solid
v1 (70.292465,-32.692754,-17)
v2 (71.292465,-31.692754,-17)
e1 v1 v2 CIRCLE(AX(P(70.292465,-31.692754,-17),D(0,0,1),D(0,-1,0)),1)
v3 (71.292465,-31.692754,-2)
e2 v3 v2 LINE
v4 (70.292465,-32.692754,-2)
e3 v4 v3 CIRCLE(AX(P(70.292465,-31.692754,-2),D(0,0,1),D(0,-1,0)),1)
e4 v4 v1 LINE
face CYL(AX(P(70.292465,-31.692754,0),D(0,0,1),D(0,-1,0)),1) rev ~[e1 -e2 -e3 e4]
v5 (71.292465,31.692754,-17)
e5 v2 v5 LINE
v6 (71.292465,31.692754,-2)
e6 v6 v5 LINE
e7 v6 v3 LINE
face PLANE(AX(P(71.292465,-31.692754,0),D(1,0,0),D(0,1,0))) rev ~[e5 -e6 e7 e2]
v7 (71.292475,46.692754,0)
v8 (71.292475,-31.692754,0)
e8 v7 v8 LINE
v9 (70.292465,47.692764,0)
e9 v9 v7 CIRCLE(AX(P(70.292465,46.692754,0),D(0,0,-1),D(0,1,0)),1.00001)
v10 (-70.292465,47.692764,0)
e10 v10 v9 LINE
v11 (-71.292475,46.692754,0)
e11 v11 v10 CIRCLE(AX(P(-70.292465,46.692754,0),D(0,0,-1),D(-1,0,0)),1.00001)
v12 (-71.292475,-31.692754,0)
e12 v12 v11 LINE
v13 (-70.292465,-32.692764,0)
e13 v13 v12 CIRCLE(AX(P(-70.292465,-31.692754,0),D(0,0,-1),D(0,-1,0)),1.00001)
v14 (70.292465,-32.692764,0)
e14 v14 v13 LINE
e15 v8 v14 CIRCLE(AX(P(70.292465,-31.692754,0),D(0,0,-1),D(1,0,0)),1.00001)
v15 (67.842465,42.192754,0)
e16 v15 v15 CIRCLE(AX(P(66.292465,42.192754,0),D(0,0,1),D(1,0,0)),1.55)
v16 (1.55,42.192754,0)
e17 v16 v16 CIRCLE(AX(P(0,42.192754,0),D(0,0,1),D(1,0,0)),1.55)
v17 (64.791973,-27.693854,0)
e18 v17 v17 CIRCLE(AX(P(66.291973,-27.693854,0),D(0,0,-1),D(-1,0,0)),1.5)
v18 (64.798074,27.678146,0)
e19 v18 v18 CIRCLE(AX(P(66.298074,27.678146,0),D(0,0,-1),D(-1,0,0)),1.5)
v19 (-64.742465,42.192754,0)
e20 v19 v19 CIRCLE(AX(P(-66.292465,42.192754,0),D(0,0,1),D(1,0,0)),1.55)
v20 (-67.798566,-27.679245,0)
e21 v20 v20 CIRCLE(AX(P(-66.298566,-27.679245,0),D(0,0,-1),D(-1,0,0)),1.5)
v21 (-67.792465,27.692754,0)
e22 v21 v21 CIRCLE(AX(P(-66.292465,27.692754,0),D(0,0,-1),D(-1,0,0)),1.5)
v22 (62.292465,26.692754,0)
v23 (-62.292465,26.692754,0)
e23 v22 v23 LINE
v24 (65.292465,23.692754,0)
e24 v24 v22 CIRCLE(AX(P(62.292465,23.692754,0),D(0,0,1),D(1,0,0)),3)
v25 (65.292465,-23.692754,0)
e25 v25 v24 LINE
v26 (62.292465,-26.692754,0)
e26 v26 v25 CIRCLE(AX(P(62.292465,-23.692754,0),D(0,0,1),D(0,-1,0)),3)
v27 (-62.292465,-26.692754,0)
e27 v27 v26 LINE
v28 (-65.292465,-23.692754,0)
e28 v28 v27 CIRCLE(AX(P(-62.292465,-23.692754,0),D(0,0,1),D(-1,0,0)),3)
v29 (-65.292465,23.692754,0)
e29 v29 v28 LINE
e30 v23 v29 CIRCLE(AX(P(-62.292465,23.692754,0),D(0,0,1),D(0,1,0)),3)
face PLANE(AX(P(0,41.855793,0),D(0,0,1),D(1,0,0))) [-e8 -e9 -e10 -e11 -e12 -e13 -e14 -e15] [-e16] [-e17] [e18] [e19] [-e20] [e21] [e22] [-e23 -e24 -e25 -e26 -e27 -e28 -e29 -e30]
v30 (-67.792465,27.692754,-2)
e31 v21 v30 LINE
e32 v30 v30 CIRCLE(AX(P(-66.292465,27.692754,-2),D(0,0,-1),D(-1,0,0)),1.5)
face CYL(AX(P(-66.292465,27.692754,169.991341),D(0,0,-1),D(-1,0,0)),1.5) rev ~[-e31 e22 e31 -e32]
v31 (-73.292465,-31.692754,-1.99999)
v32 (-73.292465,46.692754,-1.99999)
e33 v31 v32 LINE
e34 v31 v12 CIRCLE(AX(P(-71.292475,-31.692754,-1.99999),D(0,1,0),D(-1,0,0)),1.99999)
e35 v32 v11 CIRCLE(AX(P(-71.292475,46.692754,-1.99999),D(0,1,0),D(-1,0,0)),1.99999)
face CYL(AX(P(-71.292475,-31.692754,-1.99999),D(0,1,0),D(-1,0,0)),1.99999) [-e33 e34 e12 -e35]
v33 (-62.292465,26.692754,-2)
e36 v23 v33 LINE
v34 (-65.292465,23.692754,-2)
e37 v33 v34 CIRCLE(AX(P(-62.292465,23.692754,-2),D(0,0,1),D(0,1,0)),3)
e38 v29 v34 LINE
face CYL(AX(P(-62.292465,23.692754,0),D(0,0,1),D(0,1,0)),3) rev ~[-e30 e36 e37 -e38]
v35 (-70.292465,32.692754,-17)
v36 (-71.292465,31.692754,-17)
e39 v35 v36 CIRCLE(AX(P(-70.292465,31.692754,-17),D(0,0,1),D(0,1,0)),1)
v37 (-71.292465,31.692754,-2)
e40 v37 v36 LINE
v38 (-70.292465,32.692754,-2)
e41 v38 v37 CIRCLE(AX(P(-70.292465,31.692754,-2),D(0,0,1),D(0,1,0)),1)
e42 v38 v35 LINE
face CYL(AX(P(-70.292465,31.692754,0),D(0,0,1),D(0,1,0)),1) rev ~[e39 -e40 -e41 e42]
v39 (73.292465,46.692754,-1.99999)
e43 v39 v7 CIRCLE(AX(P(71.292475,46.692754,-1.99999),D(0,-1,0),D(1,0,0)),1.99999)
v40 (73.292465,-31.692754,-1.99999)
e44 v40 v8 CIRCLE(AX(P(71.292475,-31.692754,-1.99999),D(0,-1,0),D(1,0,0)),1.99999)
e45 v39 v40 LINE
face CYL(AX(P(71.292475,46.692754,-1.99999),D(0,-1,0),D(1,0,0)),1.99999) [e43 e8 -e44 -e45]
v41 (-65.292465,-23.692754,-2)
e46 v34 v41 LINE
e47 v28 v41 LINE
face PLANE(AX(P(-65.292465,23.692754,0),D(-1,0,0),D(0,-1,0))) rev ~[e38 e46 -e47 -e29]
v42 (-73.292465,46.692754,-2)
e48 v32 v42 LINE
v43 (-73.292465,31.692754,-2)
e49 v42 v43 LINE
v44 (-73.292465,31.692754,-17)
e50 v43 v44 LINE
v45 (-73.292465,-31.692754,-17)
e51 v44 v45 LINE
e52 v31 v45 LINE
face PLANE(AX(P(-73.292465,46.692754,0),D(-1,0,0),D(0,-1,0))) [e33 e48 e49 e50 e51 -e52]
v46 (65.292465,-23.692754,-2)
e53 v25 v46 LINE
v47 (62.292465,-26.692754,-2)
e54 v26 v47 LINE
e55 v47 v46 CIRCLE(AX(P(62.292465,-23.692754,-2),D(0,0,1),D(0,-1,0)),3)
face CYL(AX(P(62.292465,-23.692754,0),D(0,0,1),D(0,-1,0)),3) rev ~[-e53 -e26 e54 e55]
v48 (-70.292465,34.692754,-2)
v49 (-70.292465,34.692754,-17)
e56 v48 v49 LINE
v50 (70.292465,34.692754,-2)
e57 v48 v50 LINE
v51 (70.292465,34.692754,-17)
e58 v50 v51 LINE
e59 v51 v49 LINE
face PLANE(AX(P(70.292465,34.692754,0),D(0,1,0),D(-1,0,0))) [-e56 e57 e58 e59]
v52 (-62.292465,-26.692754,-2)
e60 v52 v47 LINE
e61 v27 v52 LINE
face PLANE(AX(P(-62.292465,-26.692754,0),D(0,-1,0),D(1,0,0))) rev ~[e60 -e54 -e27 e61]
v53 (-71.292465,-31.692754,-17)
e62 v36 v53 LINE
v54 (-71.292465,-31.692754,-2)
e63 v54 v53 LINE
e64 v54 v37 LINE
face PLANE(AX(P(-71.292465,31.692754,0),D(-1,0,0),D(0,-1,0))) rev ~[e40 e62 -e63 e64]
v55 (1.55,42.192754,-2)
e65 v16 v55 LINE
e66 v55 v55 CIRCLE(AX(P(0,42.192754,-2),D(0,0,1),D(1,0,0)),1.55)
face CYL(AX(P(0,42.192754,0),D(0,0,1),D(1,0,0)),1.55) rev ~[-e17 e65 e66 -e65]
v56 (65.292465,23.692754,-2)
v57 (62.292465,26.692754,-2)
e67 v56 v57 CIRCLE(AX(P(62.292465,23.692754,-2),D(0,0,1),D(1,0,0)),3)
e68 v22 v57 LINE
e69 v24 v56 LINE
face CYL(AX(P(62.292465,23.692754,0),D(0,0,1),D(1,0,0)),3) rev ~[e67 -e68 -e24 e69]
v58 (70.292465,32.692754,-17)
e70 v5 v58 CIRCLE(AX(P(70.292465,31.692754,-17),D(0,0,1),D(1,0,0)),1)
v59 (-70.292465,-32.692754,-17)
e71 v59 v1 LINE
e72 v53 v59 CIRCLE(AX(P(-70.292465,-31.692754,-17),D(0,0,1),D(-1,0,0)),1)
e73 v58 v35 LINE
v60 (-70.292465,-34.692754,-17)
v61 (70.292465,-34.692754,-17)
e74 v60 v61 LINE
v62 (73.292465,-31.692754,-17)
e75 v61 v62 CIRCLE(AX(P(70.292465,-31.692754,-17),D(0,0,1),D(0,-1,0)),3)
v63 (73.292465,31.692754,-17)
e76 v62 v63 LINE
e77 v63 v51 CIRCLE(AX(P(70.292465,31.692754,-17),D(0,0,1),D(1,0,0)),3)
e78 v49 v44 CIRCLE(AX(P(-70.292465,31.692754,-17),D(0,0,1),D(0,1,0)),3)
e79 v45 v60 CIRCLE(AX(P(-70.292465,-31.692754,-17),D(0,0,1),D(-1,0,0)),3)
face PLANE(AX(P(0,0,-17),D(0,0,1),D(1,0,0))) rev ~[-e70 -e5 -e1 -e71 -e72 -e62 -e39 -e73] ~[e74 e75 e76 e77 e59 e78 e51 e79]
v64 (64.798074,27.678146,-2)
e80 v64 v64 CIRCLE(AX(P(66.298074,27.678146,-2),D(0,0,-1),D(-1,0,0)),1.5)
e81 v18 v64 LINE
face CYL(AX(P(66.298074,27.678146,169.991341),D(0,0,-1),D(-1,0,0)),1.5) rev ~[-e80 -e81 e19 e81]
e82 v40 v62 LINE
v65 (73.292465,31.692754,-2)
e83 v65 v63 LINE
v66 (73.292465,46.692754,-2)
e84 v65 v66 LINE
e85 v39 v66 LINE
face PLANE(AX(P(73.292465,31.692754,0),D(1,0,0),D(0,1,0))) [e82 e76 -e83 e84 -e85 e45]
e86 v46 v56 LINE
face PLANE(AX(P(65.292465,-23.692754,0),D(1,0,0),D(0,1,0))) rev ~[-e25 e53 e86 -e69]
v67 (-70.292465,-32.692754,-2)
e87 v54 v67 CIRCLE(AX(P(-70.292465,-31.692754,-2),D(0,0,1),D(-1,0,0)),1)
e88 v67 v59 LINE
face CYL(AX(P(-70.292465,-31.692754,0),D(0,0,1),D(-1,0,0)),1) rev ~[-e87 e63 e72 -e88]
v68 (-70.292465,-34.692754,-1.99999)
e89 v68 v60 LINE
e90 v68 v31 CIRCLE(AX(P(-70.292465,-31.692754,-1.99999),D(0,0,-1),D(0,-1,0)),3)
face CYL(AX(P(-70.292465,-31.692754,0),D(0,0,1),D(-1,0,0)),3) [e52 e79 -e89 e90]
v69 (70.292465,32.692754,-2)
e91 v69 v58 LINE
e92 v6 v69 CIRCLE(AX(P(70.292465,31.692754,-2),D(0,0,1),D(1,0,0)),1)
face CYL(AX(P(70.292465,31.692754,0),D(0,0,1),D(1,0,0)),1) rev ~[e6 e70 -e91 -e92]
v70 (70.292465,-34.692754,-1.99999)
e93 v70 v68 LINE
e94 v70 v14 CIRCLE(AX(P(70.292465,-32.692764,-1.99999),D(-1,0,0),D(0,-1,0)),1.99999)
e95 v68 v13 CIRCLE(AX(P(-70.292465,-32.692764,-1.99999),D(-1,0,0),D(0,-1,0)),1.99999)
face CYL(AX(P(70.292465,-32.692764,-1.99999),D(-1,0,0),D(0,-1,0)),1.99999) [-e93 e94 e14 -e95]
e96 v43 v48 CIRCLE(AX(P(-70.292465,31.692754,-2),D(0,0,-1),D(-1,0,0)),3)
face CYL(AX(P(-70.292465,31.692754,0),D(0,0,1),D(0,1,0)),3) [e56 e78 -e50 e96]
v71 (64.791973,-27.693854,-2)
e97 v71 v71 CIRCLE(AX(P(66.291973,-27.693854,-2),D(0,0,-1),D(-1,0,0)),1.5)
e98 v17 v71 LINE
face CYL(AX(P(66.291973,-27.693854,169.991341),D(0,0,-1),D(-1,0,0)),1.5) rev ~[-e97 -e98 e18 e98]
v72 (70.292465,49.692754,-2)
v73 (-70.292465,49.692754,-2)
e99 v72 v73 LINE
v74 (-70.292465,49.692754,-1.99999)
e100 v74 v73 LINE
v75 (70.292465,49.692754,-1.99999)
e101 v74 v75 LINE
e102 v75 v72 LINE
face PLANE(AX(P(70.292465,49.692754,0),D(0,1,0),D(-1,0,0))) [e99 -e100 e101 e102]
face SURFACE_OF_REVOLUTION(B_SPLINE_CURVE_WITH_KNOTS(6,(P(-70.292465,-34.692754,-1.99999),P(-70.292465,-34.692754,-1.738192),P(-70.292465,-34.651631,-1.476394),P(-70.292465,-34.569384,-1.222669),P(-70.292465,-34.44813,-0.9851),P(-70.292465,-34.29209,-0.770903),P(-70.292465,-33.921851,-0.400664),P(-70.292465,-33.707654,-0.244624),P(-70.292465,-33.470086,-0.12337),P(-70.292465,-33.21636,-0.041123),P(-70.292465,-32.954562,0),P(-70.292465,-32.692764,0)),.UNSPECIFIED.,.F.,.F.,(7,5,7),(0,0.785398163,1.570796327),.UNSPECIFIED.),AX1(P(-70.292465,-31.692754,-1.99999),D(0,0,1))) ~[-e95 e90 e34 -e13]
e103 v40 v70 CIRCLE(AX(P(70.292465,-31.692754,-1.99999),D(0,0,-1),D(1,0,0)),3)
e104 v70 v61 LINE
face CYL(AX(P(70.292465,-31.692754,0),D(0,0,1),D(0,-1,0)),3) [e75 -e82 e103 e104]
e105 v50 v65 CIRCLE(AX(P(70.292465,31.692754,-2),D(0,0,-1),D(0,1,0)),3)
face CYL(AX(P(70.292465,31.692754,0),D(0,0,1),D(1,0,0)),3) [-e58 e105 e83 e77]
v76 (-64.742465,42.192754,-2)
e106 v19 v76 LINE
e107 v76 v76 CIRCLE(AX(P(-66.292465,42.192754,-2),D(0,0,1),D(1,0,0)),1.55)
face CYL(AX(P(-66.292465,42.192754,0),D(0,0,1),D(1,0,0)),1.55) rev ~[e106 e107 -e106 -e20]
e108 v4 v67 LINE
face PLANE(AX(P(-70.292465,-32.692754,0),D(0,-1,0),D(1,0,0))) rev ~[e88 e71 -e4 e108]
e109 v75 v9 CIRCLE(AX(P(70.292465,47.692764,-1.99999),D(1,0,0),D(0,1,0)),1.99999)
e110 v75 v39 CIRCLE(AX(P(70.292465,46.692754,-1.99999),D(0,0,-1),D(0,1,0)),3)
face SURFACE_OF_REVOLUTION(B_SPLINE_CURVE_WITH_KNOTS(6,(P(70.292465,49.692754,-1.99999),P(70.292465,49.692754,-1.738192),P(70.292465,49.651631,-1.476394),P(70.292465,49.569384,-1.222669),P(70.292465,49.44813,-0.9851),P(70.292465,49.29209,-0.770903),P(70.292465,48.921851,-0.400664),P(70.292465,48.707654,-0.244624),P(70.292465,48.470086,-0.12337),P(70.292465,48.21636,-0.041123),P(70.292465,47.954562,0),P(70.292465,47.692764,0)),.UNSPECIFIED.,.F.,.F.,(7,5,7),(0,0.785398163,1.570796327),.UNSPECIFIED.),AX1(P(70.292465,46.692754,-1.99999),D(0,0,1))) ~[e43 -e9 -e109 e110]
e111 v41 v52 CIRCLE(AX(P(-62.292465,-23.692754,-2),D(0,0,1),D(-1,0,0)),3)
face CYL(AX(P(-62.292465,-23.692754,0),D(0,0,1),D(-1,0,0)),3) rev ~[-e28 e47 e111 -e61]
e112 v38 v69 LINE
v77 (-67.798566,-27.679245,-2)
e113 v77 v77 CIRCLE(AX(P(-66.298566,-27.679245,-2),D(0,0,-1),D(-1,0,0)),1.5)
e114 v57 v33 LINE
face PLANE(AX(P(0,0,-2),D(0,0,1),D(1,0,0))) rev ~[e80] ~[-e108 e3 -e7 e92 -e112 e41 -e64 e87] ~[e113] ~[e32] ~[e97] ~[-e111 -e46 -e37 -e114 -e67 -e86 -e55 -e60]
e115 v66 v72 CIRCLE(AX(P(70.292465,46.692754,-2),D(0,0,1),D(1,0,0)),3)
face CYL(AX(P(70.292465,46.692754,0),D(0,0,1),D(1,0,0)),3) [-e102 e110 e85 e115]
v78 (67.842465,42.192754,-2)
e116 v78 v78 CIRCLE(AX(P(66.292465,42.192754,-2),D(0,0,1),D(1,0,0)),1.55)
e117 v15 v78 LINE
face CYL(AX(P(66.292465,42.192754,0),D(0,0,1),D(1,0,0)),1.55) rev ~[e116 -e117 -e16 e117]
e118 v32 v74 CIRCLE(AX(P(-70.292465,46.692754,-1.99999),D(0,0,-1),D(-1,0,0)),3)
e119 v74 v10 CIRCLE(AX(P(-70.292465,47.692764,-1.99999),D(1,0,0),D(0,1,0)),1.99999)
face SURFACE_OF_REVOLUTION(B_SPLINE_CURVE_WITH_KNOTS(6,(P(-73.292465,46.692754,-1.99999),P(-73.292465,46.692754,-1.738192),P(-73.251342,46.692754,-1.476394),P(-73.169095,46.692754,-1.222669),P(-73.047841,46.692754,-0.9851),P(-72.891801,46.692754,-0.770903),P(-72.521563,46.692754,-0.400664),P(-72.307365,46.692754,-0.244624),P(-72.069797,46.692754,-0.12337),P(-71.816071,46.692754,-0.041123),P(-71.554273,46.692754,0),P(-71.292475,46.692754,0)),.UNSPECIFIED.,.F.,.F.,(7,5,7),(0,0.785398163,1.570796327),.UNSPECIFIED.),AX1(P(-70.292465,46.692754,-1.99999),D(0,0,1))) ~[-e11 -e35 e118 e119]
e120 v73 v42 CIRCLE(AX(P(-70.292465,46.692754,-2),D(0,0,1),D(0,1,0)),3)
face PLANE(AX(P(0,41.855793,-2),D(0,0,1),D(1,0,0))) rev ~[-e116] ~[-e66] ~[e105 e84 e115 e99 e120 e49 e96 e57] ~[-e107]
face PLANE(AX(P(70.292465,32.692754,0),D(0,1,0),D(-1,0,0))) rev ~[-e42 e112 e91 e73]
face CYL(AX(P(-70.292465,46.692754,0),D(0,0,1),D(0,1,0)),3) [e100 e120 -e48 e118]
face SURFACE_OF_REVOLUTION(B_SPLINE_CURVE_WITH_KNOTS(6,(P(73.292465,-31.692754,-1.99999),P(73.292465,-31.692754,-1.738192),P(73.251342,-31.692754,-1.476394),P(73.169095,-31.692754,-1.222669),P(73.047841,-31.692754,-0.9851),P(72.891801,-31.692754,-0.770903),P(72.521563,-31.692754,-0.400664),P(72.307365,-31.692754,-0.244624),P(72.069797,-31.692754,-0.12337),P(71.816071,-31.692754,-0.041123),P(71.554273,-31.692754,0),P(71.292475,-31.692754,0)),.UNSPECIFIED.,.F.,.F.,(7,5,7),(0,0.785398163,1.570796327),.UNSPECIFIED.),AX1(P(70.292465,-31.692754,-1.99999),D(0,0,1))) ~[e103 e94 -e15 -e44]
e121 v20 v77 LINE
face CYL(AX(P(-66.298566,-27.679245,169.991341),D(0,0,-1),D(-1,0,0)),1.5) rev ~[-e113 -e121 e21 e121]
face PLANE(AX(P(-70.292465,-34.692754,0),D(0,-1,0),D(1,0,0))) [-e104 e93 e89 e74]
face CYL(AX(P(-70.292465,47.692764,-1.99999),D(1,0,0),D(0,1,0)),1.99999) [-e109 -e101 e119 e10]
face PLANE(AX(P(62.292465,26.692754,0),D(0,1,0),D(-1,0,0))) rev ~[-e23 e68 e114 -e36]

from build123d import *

# Parameters (mm, degrees)
F2_DEPTH = 17
F3_T     = -2
F1_R     = 1.55
F4_DEPTH = 2
F5_DEPTH = 25
F6_D     = 3
F7_R     = 1.99999


# Not quite as in the source:
# - a fillet or chamfer is up to 0.001 mm smaller than in the source, because OpenCascade refuses the exact size


with BuildPart() as f2:
    # F1 (on Top) → F2 (new body)
    with BuildSketch(Plane.XY):
        with BuildLine():
            ThreePointArc((73.2924652381, 31.6927541938), (72.4137855817, 33.8140745374), (70.2924652381, 34.6927541938))
            Line((70.2924652381, 34.6927541938), (-70.2924652381, 34.6927541938))
            ThreePointArc((-70.2924652381, 34.6927541938), (-72.4137855817, 33.8140745374), (-73.2924652381, 31.6927541938))
            Line((-73.2924652381, 31.6927541938), (-73.2924652381, -31.6927541938))
            ThreePointArc((-73.2924652381, -31.6927541938), (-72.4137855817, -33.8140745374), (-70.2924652381, -34.6927541938))
            Line((-70.2924652381, -34.6927541938), (70.2924652381, -34.6927541938))
            ThreePointArc((70.2924652381, -34.6927541938), (72.4137855817, -33.8140745374), (73.2924652381, -31.6927541938))
            Line((73.2924652381, -31.6927541938), (73.2924652381, 31.6927541938))
        make_face()
        with BuildLine():
            ThreePointArc((65.2924652381, -23.6927541938), (64.4137855817, -25.8140745374), (62.2924652381, -26.6927541938))
            Line((62.2924652381, -26.6927541938), (-62.2924652381, -26.6927541938))
            ThreePointArc((-62.2924652381, -26.6927541938), (-64.4137855817, -25.8140745374), (-65.2924652381, -23.6927541938))
            Line((-65.2924652381, -23.6927541938), (-65.2924652381, 23.6927541938))
            ThreePointArc((-65.2924652381, 23.6927541938), (-64.4137855817, 25.8140745374), (-62.2924652381, 26.6927541938))
            Line((-62.2924652381, 26.6927541938), (62.2924652381, 26.6927541938))
            ThreePointArc((62.2924652381, 26.6927541938), (64.4137855817, 25.8140745374), (65.2924652381, 23.6927541938))
            Line((65.2924652381, 23.6927541938), (65.2924652381, -23.6927541938))
        make_face(mode=Mode.SUBTRACT)
        with BuildLine():
            Line((-62.2924652381, -26.6927541938), (62.2924652381, -26.6927541938))
            ThreePointArc((62.2924652381, -26.6927541938), (64.4137855817, -25.8140745374), (65.2924652381, -23.6927541938))
            Line((65.2924652381, -23.6927541938), (65.2924652381, 23.6927541938))
            ThreePointArc((65.2924652381, 23.6927541938), (64.4137855817, 25.8140745374), (62.2924652381, 26.6927541938))
            Line((62.2924652381, 26.6927541938), (-62.2924652381, 26.6927541938))
            ThreePointArc((-62.2924652381, 26.6927541938), (-64.4137855817, 25.8140745374), (-65.2924652381, 23.6927541938))
            Line((-65.2924652381, 23.6927541938), (-65.2924652381, -23.6927541938))
            ThreePointArc((-65.2924652381, -23.6927541938), (-64.4137855817, -25.8140745374), (-62.2924652381, -26.6927541938))
        make_face()
    extrude(amount=-F2_DEPTH)

    # F3
    f3_openings = [f2.faces().sort_by_distance(p)[0] for p in [
        (0, 0, -17),
    ]]
    offset(amount=F3_T, openings=f3_openings)

    # F1 (on Top) → F4 (join)
    with BuildSketch(Plane.XY):
        with BuildLine():
            Line((-70.2924652381, 34.6927541938), (70.2924652381, 34.6927541938))
            ThreePointArc((70.2924652381, 34.6927541938), (72.4137855817, 33.8140745374), (73.2924652381, 31.6927541938))
            Line((73.2924652381, 31.6927541938), (73.2924652381, 34.6927541938))
            Line((73.2924652381, 34.6927541938), (73.2924652381, 46.6927541938))
            ThreePointArc((73.2924652381, 46.6927541938), (72.4137855817, 48.8140745374), (70.2924652381, 49.6927541938))
            Line((70.2924652381, 49.6927541938), (-70.2924652381, 49.6927541938))
            ThreePointArc((-70.2924652381, 49.6927541938), (-72.4137855817, 48.8140745374), (-73.2924652381, 46.6927541938))
            Line((-73.2924652381, 46.6927541938), (-73.2924652381, 34.6927541938))
            Line((-73.2924652381, 34.6927541938), (-73.2924652381, 31.6927541938))
            ThreePointArc((-73.2924652381, 31.6927541938), (-72.4137855817, 33.8140745374), (-70.2924652381, 34.6927541938))
        make_face()
        with Locations((-66.2924652381, 42.1927541938)):
            Circle(F1_R, mode=Mode.SUBTRACT)
        with Locations((0, 42.1927541938)):
            Circle(F1_R, mode=Mode.SUBTRACT)
        with Locations((66.2924652381, 42.1927541938)):
            Circle(F1_R, mode=Mode.SUBTRACT)
    extrude(amount=-F4_DEPTH)

    # F1 (on Top) → F5 (cut)
    with BuildSketch(Plane.XY):
        with BuildLine():
            Line((-62.2924652381, -26.6927541938), (62.2924652381, -26.6927541938))
            ThreePointArc((62.2924652381, -26.6927541938), (64.4137855817, -25.8140745374), (65.2924652381, -23.6927541938))
            Line((65.2924652381, -23.6927541938), (65.2924652381, 23.6927541938))
            ThreePointArc((65.2924652381, 23.6927541938), (64.4137855817, 25.8140745374), (62.2924652381, 26.6927541938))
            Line((62.2924652381, 26.6927541938), (-62.2924652381, 26.6927541938))
            ThreePointArc((-62.2924652381, 26.6927541938), (-64.4137855817, 25.8140745374), (-65.2924652381, 23.6927541938))
            Line((-65.2924652381, 23.6927541938), (-65.2924652381, -23.6927541938))
            ThreePointArc((-65.2924652381, -23.6927541938), (-64.4137855817, -25.8140745374), (-62.2924652381, -26.6927541938))
        make_face()
    extrude(amount=-F5_DEPTH, mode=Mode.SUBTRACT)

    # F6 (through all)
    with Locations(Plane.XY):
        with Locations((-66.2924652381, 27.6927541938), (66.2980739571, 27.6781461437), (66.291973394, -27.6938535203), (-66.2985658012, -27.6792454701)):
            Hole(F6_D / 2)

    # F7 (radius 2 in the source; OpenCascade refuses exactly that, so slightly less here)
    f7_edges = [f2.edges().sort_by_distance(p)[0] for p in [
        (-73.292465, 7.5, 0),
    ]]
    fillet(f7_edges, radius=F7_R)


solid = f2.part
